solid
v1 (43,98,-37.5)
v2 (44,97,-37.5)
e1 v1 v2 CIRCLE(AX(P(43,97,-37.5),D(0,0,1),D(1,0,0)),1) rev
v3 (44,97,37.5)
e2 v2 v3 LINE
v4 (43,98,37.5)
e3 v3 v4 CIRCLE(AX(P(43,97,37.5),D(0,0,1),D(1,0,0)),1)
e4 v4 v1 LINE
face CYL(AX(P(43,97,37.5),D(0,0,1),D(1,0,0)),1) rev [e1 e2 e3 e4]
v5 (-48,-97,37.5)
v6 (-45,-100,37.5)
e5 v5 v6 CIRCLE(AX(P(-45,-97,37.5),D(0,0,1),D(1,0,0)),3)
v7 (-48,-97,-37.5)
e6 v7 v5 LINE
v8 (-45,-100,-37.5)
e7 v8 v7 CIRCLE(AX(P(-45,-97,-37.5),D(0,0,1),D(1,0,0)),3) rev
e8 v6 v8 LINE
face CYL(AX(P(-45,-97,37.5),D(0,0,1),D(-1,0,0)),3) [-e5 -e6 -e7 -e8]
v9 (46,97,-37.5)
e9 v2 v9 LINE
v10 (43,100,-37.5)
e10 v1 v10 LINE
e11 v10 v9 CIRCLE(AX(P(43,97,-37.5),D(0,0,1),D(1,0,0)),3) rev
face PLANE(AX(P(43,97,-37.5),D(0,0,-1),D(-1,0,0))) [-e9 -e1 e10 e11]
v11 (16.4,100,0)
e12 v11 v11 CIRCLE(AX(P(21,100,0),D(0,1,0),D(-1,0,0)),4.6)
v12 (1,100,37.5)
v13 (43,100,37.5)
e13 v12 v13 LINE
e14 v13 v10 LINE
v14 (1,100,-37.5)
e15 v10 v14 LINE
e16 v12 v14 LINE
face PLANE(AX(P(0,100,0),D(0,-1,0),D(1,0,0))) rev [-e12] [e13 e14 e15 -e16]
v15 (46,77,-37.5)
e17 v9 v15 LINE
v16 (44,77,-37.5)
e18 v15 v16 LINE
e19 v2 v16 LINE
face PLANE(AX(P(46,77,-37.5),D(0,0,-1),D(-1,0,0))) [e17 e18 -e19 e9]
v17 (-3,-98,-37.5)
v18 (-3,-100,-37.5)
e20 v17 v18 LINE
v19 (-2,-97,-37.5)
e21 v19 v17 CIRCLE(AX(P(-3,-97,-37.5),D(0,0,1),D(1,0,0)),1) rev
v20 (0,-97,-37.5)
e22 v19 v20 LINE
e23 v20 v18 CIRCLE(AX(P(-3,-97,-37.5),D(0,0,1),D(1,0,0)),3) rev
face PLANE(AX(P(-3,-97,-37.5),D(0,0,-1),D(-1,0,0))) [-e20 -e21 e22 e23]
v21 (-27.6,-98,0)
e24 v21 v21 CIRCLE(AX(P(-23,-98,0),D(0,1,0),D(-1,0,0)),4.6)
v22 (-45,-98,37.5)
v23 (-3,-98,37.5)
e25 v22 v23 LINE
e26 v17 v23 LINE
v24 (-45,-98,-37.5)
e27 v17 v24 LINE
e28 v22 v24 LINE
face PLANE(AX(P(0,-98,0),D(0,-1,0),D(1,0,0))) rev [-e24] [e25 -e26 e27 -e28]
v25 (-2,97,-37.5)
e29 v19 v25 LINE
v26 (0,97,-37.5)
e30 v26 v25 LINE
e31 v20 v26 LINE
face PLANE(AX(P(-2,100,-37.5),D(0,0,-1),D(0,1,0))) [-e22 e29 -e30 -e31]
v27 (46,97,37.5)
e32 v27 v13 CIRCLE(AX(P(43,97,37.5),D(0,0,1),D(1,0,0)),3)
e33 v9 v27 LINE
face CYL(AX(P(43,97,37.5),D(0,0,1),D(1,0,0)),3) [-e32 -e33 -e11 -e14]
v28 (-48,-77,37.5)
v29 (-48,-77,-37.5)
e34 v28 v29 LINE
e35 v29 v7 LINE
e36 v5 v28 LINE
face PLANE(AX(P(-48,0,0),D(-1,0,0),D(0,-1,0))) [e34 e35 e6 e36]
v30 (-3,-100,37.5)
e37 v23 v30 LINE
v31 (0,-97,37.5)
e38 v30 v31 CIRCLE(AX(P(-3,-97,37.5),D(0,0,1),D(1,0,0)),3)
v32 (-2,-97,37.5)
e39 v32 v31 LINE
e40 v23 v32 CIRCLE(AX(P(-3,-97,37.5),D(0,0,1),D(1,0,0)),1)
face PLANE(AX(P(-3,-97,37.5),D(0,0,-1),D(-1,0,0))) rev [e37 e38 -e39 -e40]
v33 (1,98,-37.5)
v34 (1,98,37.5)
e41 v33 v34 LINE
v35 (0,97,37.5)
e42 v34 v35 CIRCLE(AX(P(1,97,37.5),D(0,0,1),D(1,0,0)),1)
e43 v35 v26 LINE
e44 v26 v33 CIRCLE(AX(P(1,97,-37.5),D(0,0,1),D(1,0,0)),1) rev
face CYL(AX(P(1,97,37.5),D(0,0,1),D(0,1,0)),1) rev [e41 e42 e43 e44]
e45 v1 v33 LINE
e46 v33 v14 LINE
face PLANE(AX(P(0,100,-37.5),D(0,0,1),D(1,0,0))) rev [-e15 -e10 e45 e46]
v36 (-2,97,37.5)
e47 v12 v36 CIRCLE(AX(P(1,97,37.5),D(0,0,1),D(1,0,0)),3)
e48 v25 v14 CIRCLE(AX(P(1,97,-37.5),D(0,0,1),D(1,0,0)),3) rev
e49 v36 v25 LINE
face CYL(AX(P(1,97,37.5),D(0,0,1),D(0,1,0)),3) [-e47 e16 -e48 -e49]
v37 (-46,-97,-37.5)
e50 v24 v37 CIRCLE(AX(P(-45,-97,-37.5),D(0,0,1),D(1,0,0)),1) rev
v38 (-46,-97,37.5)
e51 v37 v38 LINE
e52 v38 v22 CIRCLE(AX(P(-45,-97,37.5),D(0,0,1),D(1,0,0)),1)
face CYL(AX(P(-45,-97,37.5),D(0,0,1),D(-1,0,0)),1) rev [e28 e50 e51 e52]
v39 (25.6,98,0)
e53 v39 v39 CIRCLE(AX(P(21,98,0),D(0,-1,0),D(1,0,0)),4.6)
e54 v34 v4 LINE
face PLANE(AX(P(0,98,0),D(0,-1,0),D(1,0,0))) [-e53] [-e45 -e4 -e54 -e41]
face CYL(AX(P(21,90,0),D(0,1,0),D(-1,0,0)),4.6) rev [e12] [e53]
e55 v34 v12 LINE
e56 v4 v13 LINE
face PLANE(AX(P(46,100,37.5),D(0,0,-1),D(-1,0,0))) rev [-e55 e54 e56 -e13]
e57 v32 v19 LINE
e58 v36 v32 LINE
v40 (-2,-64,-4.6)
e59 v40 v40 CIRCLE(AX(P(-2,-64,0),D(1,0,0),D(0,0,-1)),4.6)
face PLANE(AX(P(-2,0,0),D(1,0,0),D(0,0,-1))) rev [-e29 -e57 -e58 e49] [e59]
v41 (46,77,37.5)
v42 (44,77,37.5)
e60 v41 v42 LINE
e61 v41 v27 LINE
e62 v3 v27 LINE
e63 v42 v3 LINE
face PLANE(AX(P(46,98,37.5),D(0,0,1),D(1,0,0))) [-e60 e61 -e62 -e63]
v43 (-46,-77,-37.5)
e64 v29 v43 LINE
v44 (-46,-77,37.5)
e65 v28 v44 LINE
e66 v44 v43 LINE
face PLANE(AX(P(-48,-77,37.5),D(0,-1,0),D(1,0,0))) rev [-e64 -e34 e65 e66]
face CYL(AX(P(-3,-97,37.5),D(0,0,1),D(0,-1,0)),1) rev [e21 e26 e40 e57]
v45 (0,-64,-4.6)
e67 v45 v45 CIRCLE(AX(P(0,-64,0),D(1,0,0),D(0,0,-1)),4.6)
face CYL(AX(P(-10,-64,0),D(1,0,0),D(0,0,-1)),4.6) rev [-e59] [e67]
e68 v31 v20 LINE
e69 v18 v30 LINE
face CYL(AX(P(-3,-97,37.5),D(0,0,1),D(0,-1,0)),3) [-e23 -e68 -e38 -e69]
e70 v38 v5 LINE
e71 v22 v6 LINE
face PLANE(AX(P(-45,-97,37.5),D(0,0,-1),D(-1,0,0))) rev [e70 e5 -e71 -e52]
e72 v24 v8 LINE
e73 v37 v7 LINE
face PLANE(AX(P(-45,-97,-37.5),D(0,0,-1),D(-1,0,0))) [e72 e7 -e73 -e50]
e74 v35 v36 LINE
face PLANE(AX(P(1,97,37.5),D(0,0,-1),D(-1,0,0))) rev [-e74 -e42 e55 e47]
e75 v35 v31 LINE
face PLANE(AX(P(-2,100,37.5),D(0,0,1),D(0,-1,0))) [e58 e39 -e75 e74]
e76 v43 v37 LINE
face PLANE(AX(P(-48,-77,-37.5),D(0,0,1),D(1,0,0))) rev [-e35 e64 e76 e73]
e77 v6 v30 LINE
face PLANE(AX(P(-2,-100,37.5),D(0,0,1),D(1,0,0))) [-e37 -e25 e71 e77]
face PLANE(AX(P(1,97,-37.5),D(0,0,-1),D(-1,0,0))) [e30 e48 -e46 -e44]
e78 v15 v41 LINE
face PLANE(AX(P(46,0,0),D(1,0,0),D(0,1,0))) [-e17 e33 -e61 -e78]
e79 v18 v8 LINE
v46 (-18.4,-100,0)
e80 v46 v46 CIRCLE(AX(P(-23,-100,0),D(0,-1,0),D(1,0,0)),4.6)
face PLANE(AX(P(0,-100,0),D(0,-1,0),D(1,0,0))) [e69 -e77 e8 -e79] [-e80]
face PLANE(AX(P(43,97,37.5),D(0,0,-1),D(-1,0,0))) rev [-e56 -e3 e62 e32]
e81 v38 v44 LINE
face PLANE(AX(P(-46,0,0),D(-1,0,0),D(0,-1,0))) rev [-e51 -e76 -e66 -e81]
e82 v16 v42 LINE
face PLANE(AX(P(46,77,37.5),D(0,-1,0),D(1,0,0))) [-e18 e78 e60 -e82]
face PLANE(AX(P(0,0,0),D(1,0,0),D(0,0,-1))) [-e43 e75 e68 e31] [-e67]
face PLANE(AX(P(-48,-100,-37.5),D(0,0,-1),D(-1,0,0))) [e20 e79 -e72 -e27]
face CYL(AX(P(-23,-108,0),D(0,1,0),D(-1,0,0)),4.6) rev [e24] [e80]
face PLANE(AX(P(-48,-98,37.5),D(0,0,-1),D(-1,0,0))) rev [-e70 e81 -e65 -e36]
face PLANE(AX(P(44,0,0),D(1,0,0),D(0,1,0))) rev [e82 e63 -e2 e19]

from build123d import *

# Parameters (mm, degrees)
SKETCH1_W                      = 75
SKETCH1_H                      = 200
BASE_FLANGE1_DEPTH             = 2
EDGE_FLANGE1_STRIP_W           = 10
EDGE_FLANGE1_STRIP_H           = 2
EDGE_FLANGE1_STRIP_CUT_DEPTH   = 75
EDGE_FLANGE1_STRIP_2_W         = 10
EDGE_FLANGE1_STRIP_2_H         = 2
EDGE_FLANGE1_STRIP_CUT_2_DEPTH = 75
EDGE_FLANGE1_DEPTH             = 75
EDGE_FLANGE1_BEND_DEPTH        = 75
EDGE_FLANGE2_STRIP_W           = 10
EDGE_FLANGE2_STRIP_H           = 2
EDGE_FLANGE2_STRIP_CUT_DEPTH   = 75
EDGE_FLANGE2_STRIP_2_W         = 10
EDGE_FLANGE2_STRIP_2_H         = 2
EDGE_FLANGE2_STRIP_CUT_2_DEPTH = 75
EDGE_FLANGE2_DEPTH             = 75
EDGE_FLANGE2_BEND_DEPTH        = 75
SKETCH18_R                     = 4.6
CUT_EXTRUDE1_DEPTH             = 10
SKETCH19_R                     = 4.6
CUT_EXTRUDE2_DEPTH             = 10
SKETCH20_R                     = 4.6
CUT_EXTRUDE3_DEPTH             = 10


# Sheet-metal steps are written as plain solids
with BuildPart() as part:
    # Sketch1 → Base-Flange1 (new body)
    with BuildSketch(Plane(origin=(0, 0, 0), x_dir=(0, 0, -1), z_dir=(1, 0, 0))):
        Rectangle(SKETCH1_W, SKETCH1_H)
    extrude(amount=-BASE_FLANGE1_DEPTH)

    # Edge-Flange1 strip (across the edge) → Edge-Flange1 strip cut (cut)
    with BuildSketch(Plane(origin=(0, 100, -37.5), x_dir=(0, -1, 0), z_dir=(0, 0, 1))):
        with Locations((-2, -1)):
            Rectangle(EDGE_FLANGE1_STRIP_W, EDGE_FLANGE1_STRIP_H)
    extrude(amount=EDGE_FLANGE1_STRIP_CUT_DEPTH, mode=Mode.SUBTRACT)

    # Edge-Flange1 strip 2 (across the edge) → Edge-Flange1 strip cut 2 (cut)
    with BuildSketch(Plane(origin=(-2, -100, -37.5), x_dir=(0, 1, 0), z_dir=(0, 0, 1))):
        with Locations((-2, -1)):
            Rectangle(EDGE_FLANGE1_STRIP_2_W, EDGE_FLANGE1_STRIP_2_H)
    extrude(amount=EDGE_FLANGE1_STRIP_CUT_2_DEPTH, mode=Mode.SUBTRACT)

    # Edge-Flange1 section (across the edge) → Edge-Flange1 (add)
    with BuildSketch(Plane(origin=(0, 100, -37.5), x_dir=(0, -1, 0), z_dir=(0, 0, 1))):
        with BuildLine():
            Line((0, 1), (0, 46))
            Line((0, 46), (2, 46))
            Line((2, 46), (2, 1))
            ThreePointArc((2, 1), (2.292893219, 0.292893219), (3, 0))
            Line((3, 0), (3, -2))
            ThreePointArc((3, -2), (0.878679656, -1.121320344), (0, 1))
        make_face()
    extrude(amount=EDGE_FLANGE1_DEPTH)

    # Edge-Flange1 section 2 (across the edge) → Edge-Flange1 bend (add)
    with BuildSketch(Plane(origin=(-2, -100, -37.5), x_dir=(0, 1, 0), z_dir=(0, 0, 1))):
        with BuildLine():
            Line((0, 1), (0, 46))
            Line((0, 46), (2, 46))
            Line((2, 46), (2, 1))
            ThreePointArc((2, 1), (2.292893219, 0.292893219), (3, 0))
            Line((3, 0), (3, -2))
            ThreePointArc((3, -2), (0.878679656, -1.121320344), (0, 1))
        make_face()
    extrude(amount=EDGE_FLANGE1_BEND_DEPTH)

    # Edge-Flange2 strip (across the edge) → Edge-Flange2 strip cut (cut)
    with BuildSketch(Plane(origin=(46, 98, -37.5), x_dir=(-1, 0, 0), z_dir=(0, 0, 1))):
        with Locations((-2, -1)):
            Rectangle(EDGE_FLANGE2_STRIP_W, EDGE_FLANGE2_STRIP_H)
    extrude(amount=EDGE_FLANGE2_STRIP_CUT_DEPTH, mode=Mode.SUBTRACT)

    # Edge-Flange2 strip 2 (across the edge) → Edge-Flange2 strip cut 2 (cut)
    with BuildSketch(Plane(origin=(-48, -98, -37.5), x_dir=(1, 0, 0), z_dir=(0, 0, 1))):
        with Locations((-2, -1)):
            Rectangle(EDGE_FLANGE2_STRIP_2_W, EDGE_FLANGE2_STRIP_2_H)
    extrude(amount=EDGE_FLANGE2_STRIP_CUT_2_DEPTH, mode=Mode.SUBTRACT)

    # Edge-Flange2 section (across the edge) → Edge-Flange2 (add)
    with BuildSketch(Plane(origin=(46, 98, -37.5), x_dir=(-1, 0, 0), z_dir=(0, 0, 1))):
        with BuildLine():
            Line((0, 1), (0, 21))
            Line((0, 21), (2, 21))
            Line((2, 21), (2, 1))
            ThreePointArc((2, 1), (2.292893219, 0.292893219), (3, 0))
            Line((3, 0), (3, -2))
            ThreePointArc((3, -2), (0.878679656, -1.121320344), (0, 1))
        make_face()
    extrude(amount=EDGE_FLANGE2_DEPTH)

    # Edge-Flange2 section 2 (across the edge) → Edge-Flange2 bend (add)
    with BuildSketch(Plane(origin=(-48, -98, -37.5), x_dir=(1, 0, 0), z_dir=(0, 0, 1))):
        with BuildLine():
            Line((0, 1), (0, 21))
            Line((0, 21), (2, 21))
            Line((2, 21), (2, 1))
            ThreePointArc((2, 1), (2.292893219, 0.292893219), (3, 0))
            Line((3, 0), (3, -2))
            ThreePointArc((3, -2), (0.878679656, -1.121320344), (0, 1))
        make_face()
    extrude(amount=EDGE_FLANGE2_BEND_DEPTH)

    # Sketch18 → Cut-Extrude1 (cut)
    with BuildSketch(Plane(origin=(0, 100, 0), x_dir=(1, 0, 0), z_dir=(0, 1, 0))):
        with Locations(Location((21, 0, 0), (0, 0, 180))):
            Circle(SKETCH18_R)
    extrude(amount=-CUT_EXTRUDE1_DEPTH, mode=Mode.SUBTRACT)

    # Sketch19 → Cut-Extrude2 (cut)
    with BuildSketch(Plane(origin=(0, -98, 0), x_dir=(1, 0, 0), z_dir=(0, 1, 0))):
        with Locations(Location((-23, 0, 0), (0, 0, 180))):
            Circle(SKETCH19_R)
    extrude(amount=-CUT_EXTRUDE2_DEPTH, mode=Mode.SUBTRACT)

    # Sketch20 → Cut-Extrude3 (cut)
    with BuildSketch(Plane(origin=(0, 0, 0), x_dir=(0, 0, -1), z_dir=(1, 0, 0))):
        with Locations((0, -64)):
            Circle(SKETCH20_R)
    extrude(amount=-CUT_EXTRUDE3_DEPTH, mode=Mode.SUBTRACT)


solid = part.part
